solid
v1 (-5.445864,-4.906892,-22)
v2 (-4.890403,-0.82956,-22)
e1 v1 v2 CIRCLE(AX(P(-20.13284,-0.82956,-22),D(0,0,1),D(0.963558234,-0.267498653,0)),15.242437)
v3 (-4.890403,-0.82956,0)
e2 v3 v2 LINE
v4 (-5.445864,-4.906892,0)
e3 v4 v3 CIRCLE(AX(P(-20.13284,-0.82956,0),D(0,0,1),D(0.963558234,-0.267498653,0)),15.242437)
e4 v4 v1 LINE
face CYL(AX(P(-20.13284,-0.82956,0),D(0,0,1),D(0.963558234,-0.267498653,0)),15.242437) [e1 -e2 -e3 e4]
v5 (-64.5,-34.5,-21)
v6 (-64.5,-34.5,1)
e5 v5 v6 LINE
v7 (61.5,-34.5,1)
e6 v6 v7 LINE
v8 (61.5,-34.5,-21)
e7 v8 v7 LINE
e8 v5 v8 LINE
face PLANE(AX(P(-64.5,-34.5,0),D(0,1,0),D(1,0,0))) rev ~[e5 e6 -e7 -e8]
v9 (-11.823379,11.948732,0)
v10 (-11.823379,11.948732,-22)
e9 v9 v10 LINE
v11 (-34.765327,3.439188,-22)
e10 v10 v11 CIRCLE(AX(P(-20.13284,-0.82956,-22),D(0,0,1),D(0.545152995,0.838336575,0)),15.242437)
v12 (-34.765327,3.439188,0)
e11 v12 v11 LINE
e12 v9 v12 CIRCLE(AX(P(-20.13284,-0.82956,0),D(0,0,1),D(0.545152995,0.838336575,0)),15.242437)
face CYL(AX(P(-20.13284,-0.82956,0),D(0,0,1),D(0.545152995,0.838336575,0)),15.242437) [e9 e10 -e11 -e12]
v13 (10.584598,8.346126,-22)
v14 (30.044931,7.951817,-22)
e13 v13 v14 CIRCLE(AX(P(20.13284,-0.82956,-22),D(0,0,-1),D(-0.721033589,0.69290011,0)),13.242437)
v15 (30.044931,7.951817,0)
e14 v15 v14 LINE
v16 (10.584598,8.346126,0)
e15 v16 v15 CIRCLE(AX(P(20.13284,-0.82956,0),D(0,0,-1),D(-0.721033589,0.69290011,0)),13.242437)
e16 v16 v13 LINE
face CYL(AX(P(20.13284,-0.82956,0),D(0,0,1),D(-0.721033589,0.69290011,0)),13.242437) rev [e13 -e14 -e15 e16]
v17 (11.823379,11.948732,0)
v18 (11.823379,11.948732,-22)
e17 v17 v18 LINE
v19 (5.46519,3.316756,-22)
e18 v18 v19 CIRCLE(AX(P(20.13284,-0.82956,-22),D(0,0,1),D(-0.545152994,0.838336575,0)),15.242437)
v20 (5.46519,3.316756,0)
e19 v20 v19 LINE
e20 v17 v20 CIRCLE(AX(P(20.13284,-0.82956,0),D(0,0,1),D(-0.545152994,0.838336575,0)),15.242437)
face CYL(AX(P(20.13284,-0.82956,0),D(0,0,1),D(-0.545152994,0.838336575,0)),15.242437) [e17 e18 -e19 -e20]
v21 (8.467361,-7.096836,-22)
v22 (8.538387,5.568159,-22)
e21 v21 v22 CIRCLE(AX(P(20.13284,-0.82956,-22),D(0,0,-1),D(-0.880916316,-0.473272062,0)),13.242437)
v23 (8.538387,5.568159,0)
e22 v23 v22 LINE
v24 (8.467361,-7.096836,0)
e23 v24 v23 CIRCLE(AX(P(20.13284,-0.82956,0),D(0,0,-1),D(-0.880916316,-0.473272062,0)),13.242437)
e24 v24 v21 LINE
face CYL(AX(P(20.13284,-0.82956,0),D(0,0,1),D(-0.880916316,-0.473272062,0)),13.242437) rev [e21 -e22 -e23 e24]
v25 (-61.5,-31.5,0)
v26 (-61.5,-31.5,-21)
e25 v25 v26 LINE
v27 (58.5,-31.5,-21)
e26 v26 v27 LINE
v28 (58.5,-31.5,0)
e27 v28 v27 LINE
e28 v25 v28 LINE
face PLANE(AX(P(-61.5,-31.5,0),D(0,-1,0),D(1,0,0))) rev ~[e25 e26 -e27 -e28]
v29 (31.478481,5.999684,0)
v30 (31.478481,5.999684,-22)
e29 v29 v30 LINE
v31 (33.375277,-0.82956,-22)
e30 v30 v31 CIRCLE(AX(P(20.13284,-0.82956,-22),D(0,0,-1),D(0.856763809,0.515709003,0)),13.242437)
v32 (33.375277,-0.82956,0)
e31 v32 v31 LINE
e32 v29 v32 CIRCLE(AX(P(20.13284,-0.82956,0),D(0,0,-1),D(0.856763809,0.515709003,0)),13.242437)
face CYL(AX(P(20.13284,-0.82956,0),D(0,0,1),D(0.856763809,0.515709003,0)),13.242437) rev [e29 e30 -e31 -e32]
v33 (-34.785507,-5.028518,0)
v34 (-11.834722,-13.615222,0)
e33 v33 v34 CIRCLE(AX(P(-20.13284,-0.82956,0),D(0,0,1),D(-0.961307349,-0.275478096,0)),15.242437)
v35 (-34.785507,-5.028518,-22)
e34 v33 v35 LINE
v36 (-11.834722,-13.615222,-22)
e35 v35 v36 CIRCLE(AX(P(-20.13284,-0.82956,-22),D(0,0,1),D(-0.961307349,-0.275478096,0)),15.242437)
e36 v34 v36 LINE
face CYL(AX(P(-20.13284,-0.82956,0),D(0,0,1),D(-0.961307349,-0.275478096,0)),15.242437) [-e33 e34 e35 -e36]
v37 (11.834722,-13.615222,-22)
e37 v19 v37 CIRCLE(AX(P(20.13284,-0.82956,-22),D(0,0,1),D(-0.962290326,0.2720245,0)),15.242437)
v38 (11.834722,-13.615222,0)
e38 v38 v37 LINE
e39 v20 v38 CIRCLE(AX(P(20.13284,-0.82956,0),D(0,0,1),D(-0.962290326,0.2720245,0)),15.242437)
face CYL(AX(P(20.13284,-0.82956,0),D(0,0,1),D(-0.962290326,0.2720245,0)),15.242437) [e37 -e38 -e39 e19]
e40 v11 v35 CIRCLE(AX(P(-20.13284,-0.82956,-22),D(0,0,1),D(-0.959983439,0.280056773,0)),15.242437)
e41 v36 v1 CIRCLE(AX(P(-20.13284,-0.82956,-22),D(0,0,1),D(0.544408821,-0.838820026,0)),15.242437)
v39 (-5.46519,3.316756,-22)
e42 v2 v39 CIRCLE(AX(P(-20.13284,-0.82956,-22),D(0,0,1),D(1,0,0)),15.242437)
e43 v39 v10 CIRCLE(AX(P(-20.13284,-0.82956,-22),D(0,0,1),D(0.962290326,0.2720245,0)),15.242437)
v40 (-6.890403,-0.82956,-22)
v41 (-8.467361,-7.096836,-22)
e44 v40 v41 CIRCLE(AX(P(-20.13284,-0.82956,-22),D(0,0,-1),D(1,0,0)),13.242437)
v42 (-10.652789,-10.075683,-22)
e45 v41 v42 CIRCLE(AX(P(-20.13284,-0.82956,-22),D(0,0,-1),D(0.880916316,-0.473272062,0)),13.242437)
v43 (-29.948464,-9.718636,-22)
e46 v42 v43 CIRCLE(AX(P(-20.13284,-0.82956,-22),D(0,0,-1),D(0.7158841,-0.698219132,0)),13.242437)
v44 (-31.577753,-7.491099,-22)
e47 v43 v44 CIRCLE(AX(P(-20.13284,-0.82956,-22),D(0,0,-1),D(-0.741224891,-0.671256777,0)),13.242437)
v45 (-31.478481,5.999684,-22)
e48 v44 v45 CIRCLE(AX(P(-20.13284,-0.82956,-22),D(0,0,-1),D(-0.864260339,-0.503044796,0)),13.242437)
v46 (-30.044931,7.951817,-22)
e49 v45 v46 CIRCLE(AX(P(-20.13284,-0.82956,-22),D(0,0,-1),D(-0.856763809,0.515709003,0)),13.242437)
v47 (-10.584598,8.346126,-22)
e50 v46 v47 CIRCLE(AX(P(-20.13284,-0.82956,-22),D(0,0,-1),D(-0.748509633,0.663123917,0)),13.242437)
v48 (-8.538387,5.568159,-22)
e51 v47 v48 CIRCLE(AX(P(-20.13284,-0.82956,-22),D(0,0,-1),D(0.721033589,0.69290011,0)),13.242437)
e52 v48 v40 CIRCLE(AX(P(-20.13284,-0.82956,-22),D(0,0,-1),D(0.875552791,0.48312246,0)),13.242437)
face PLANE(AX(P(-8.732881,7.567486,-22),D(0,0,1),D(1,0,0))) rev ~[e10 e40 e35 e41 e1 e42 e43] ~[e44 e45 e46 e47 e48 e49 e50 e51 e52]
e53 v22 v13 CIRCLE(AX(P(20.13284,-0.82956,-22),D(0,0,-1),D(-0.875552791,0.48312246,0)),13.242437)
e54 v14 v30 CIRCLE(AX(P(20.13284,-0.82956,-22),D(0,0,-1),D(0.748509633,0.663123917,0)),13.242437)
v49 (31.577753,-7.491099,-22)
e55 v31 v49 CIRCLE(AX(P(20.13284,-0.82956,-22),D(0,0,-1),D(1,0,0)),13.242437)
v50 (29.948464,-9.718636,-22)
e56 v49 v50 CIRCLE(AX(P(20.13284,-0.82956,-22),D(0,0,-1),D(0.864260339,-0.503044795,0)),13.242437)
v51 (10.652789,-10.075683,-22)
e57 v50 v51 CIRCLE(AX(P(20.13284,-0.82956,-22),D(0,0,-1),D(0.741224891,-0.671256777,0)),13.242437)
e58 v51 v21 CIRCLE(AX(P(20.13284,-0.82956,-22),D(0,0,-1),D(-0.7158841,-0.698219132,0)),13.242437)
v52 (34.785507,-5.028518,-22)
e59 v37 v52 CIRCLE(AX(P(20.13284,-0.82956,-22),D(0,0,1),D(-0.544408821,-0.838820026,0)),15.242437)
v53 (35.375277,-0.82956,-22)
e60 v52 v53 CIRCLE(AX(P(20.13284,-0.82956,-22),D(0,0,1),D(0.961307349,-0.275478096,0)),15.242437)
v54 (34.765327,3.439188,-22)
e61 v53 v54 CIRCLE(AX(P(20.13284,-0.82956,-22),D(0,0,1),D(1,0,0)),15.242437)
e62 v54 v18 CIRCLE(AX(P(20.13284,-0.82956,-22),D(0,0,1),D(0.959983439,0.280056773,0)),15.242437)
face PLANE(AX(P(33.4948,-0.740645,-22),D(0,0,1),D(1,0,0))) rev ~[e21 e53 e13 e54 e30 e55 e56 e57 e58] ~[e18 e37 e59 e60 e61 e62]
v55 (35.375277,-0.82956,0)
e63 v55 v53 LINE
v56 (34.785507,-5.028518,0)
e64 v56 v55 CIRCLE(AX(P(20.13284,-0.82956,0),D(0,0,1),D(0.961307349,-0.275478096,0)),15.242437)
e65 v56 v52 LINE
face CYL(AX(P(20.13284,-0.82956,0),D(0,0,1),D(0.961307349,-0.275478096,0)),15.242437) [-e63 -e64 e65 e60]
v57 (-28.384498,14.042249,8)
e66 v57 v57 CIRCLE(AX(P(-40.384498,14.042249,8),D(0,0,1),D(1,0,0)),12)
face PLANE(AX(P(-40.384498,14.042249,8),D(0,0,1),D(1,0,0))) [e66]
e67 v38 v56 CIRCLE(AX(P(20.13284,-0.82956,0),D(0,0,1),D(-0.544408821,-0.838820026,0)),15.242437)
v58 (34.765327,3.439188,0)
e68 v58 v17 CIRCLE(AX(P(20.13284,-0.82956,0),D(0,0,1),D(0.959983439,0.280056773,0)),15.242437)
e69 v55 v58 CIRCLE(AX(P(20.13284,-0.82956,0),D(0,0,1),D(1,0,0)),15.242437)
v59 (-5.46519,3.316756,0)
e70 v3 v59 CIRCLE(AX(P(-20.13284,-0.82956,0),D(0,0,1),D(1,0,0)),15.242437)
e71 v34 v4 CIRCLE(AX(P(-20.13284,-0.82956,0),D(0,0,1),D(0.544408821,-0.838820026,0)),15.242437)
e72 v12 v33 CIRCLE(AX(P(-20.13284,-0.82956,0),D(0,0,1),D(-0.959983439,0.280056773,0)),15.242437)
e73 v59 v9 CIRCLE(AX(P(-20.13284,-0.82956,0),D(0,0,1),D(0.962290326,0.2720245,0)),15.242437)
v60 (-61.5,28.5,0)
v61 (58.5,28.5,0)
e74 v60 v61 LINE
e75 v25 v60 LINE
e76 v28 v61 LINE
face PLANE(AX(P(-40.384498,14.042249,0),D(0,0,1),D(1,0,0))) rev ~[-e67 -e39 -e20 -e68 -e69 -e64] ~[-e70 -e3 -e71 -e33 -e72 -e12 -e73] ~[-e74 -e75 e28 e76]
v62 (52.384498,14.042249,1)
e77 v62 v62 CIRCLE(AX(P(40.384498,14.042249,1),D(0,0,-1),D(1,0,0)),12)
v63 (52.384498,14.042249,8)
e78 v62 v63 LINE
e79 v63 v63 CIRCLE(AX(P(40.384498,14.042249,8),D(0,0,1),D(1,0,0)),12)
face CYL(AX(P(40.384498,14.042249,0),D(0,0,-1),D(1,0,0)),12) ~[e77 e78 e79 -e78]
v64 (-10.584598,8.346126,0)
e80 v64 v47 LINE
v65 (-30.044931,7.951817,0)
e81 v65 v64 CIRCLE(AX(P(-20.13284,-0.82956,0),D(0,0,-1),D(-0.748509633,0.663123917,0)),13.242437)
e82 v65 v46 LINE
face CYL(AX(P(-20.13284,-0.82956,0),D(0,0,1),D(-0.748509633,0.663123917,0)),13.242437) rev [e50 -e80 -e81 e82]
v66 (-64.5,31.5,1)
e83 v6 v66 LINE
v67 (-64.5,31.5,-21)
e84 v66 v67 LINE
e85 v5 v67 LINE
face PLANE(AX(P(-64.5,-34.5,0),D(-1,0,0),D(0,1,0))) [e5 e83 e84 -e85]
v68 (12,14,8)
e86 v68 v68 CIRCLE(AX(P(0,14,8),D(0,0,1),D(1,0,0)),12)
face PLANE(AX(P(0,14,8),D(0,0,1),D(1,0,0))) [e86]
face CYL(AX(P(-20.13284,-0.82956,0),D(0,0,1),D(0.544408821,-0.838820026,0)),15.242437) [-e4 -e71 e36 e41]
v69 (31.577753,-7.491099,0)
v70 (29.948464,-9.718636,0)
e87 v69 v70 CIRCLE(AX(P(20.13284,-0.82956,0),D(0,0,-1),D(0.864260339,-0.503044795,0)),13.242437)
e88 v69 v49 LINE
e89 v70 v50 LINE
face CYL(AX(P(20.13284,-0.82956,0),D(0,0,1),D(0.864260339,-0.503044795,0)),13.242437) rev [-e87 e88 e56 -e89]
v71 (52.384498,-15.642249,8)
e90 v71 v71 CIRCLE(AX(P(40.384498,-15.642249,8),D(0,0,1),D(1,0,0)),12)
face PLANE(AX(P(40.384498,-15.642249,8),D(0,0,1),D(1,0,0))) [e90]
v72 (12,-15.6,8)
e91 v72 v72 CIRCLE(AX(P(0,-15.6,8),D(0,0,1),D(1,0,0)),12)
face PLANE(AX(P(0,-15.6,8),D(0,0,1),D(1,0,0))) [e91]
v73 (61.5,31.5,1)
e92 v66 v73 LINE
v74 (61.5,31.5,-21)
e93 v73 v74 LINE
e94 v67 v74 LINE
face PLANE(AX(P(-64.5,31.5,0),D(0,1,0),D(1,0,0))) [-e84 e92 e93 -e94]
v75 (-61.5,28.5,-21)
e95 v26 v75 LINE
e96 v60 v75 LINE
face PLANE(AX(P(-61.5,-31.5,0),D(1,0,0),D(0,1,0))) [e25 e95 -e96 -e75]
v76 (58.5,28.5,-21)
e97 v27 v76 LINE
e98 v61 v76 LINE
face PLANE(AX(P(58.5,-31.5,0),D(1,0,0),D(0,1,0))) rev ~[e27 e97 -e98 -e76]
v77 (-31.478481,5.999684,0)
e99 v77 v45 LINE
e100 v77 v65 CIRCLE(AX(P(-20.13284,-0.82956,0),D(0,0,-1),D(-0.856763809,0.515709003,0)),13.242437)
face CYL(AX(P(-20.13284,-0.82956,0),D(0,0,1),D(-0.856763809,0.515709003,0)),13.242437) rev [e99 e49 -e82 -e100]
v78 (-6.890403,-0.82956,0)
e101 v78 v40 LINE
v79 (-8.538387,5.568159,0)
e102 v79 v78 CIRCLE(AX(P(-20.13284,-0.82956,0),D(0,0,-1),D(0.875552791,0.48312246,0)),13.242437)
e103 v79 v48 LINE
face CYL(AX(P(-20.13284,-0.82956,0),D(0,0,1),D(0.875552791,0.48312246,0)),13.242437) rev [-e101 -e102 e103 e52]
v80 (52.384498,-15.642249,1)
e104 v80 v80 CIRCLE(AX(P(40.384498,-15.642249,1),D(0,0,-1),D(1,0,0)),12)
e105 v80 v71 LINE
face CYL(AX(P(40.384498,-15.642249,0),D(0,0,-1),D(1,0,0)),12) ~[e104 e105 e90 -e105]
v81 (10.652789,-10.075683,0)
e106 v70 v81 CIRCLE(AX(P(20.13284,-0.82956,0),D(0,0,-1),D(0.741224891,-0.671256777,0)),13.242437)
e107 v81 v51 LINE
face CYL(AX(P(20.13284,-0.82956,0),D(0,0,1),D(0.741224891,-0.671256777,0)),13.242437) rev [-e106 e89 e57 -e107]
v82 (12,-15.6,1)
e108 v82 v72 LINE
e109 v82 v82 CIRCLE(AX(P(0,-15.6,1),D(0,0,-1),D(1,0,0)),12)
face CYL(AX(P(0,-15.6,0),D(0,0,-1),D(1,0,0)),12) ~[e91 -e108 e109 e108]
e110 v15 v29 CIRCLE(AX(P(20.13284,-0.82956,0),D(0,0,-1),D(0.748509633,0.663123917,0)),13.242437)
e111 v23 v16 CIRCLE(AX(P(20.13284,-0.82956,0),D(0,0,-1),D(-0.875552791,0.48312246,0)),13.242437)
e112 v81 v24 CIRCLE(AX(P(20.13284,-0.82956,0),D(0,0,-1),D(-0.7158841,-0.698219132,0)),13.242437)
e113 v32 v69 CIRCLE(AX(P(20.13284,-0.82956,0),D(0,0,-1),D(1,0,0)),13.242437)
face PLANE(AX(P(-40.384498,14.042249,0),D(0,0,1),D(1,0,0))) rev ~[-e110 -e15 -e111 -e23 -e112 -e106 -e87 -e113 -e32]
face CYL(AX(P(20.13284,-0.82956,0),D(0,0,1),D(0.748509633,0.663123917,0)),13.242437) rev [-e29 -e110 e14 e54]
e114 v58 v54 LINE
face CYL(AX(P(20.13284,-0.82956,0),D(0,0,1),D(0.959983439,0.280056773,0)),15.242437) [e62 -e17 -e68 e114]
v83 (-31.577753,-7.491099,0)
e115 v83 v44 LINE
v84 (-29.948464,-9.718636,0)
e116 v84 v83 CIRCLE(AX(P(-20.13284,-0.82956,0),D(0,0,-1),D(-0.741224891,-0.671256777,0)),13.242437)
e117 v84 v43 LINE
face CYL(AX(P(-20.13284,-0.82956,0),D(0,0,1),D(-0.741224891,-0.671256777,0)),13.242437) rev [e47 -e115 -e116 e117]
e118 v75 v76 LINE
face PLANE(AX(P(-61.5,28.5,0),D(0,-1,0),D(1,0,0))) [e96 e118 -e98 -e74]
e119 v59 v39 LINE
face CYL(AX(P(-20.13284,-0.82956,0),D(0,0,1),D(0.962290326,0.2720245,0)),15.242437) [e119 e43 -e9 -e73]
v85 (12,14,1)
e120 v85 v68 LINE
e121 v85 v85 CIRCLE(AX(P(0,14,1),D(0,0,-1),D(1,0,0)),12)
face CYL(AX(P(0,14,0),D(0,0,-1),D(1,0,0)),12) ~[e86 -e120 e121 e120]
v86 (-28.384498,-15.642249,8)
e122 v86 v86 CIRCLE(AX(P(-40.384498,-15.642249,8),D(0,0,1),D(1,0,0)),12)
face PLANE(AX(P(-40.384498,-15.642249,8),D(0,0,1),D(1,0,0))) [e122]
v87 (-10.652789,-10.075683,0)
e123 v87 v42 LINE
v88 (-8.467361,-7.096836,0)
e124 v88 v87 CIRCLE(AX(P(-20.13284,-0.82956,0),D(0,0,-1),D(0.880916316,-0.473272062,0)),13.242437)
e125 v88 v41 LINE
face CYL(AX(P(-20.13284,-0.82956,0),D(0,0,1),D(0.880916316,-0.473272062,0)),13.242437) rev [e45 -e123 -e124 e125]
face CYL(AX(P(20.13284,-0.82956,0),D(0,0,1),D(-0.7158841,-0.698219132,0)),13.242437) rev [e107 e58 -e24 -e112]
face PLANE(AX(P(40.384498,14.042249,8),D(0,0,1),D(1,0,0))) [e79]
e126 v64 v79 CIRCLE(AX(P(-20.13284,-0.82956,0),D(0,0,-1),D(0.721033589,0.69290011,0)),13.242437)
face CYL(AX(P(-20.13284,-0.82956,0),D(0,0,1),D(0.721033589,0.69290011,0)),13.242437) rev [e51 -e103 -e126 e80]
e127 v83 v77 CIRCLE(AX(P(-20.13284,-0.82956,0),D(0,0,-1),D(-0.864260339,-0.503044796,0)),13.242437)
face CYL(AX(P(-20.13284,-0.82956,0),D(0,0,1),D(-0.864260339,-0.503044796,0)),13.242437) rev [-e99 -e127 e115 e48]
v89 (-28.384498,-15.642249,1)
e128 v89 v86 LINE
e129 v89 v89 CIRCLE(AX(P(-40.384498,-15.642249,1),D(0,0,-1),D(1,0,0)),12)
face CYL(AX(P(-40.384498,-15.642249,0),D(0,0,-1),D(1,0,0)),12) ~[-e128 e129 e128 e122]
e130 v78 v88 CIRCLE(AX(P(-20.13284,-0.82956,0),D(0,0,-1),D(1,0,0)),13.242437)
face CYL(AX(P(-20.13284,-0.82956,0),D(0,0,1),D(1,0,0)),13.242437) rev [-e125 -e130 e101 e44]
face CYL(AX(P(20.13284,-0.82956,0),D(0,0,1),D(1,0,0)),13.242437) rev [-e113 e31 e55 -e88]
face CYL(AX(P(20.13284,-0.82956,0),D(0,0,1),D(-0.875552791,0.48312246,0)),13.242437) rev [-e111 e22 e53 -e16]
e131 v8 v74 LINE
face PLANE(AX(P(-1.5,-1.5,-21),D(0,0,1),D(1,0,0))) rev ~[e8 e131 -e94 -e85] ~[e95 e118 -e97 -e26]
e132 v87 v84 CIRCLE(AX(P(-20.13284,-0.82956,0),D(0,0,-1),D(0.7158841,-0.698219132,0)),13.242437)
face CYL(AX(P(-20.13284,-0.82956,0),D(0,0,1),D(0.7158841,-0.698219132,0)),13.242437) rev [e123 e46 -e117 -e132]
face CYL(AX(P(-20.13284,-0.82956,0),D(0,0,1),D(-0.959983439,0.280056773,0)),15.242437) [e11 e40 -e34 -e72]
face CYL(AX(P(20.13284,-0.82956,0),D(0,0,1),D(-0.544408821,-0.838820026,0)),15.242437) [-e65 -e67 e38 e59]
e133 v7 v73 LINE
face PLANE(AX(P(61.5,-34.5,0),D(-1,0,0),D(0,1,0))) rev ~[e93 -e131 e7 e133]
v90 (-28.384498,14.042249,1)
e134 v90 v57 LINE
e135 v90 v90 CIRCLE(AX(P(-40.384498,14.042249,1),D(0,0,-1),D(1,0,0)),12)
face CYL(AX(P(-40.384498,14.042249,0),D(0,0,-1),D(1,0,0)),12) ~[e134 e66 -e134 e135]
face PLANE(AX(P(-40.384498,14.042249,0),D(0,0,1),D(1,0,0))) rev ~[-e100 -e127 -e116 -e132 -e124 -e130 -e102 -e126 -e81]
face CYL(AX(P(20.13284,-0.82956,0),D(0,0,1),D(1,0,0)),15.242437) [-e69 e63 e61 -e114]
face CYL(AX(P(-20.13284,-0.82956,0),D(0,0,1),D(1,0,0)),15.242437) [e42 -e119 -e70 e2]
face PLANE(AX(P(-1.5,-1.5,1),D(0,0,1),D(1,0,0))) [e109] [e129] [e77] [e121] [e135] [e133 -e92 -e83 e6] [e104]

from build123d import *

# Parameters (mm, degrees)
F0_W     = 126
F0_H     = 66
F0_W_2   = 120
F0_H_2   = 60
F1_DEPTH = 21
F2_W     = 126
F2_H     = 66
F3_DEPTH = 1
F0_R     = 12
F4_DEPTH = 8
F6_DEPTH = 22


with BuildPart() as f1:
    # F0 (on Top) → F1 (new body)
    with BuildSketch(Plane.XY):
        with Locations((-1.5, -1.5)):
            Rectangle(F0_W, F0_H)
        with Locations((-1.5, -1.5)):
            Rectangle(F0_W_2, F0_H_2, mode=Mode.SUBTRACT)
    extrude(amount=-F1_DEPTH)

    # F2 (on face) → F3 (join)
    with BuildSketch(Plane.XY):
        with Locations((-1.5, -1.5)):
            Rectangle(F2_W, F2_H)
    extrude(amount=F3_DEPTH)

    # F0 (on Top) → F4 (join)
    with BuildSketch(Plane.XY):
        with Locations((-40.3844975889, 14.0422494113)):
            Circle(F0_R)
        with Locations((0, 14)):
            Circle(F0_R)
        with Locations((-40.3844975889, -15.6422494113)):
            Circle(F0_R)
        with Locations((0, -15.6)):
            Circle(F0_R)
        with Locations((40.3844975889, -15.6422494113)):
            Circle(F0_R)
        with Locations((40.3844975889, 14.0422494113)):
            Circle(F0_R)
    extrude(amount=F4_DEPTH)

    # F5 (on face) → F6 (join)
    with BuildSketch(Plane.XY):
        with BuildLine():
            ThreePointArc((31.4784805761, 5.99968384), (32.8922690999, 2.7143222033), (33.3752768321, -0.8295602165))
            ThreePointArc((33.3752768321, -0.8295602165), (32.9180007232, -4.2794585958), (31.5777529034, -7.4910993057))
            ThreePointArc((31.5777529034, -7.4910993057), (33.0771463209, -6.123708691), (34.7855065256, -5.0285177832))
            ThreePointArc((34.7855065256, -5.0285177832), (35.2271141548, -2.9496471052), (35.3752768321, -0.8295602165))
            ThreePointArc((35.3752768321, -0.8295602165), (35.2220188743, 1.3264920966), (34.7653269231, 3.4391875409))
            ThreePointArc((34.7653269231, 3.4391875409), (33.0099261031, 4.57569273), (31.4784805761, 5.99968384))
        make_face()
        with BuildLine():
            ThreePointArc((30.044931449, 7.9518165828), (30.8064288175, 7.0085924135), (31.4784805761, 5.99968384))
            ThreePointArc((31.4784805761, 5.99968384), (33.0099261031, 4.57569273), (34.7653269231, 3.4391875409))
            ThreePointArc((34.7653269231, 3.4391875409), (32.4184567267, 8.1923854782), (28.5856333111, 11.8543733283))
            ThreePointArc((28.5856333111, 11.8543733283), (29.1446126861, 9.8392757768), (30.044931449, 7.9518165828))
        make_face()
        with BuildLine():
            ThreePointArc((34.7855065256, -5.0285177832), (33.0771463209, -6.123708691), (31.5777529034, -7.4910993057))
            ThreePointArc((31.5777529034, -7.4910993057), (30.8212956484, -8.6474276201), (29.948463719, -9.718635897))
            ThreePointArc((29.948463719, -9.718635897), (29.0995516946, -11.5618087289), (28.5733528944, -13.5216690648))
            ThreePointArc((28.5733528944, -13.5216690648), (32.4355688891, -9.8281570151), (34.7855065256, -5.0285177832))
        make_face()
        with BuildLine():
            ThreePointArc((10.5845976874, 8.3461259481), (20.4011056558, 12.410159384), (30.044931449, 7.9518165828))
            ThreePointArc((30.044931449, 7.9518165828), (29.1446126861, 9.8392757768), (28.5856333111, 11.8543733283))
            ThreePointArc((28.5856333111, 11.8543733283), (20.2186418923, 14.4126354365), (11.8233794228, 11.9487323369))
            ThreePointArc((11.8233794228, 11.9487323369), (11.3478655588, 10.0979560153), (10.5845976874, 8.3461259481))
        make_face()
        with BuildLine():
            ThreePointArc((28.5733528944, -13.5216690648), (29.0995516946, -11.5618087289), (29.948463719, -9.718635897))
            ThreePointArc((29.948463719, -9.718635897), (20.3778358891, -14.0697308571), (10.652789482, -10.0756831869))
            ThreePointArc((10.652789482, -10.0756831869), (11.3821848264, -11.7992278973), (11.8347224415, -13.615221742))
            ThreePointArc((11.8347224415, -13.615221742), (20.2180287599, -16.0717593087), (28.5733528944, -13.5216690648))
        make_face()
        with BuildLine():
            ThreePointArc((8.5383868776, 5.5681585921), (9.4706325231, 7.0240682624), (10.5845976874, 8.3461259481))
            ThreePointArc((10.5845976874, 8.3461259481), (11.3478655588, 10.0979560153), (11.8233794228, 11.9487323369))
            ThreePointArc((11.8233794228, 11.9487323369), (7.86032363, 8.2101986383), (5.4651898622, 3.3167561214))
            ThreePointArc((5.4651898622, 3.3167561214), (7.0917024506, 4.3197233329), (8.5383868776, 5.5681585921))
        make_face()
        with BuildLine():
            ThreePointArc((11.8347224415, -13.615221742), (11.3821848264, -11.7992278973), (10.652789482, -10.0756831869))
            ThreePointArc((10.652789482, -10.0756831869), (9.455680238, -8.6628486697), (8.46736073, -7.0968357497))
            ThreePointArc((8.46736073, -7.0968357497), (7.0422594659, -5.8836950637), (5.4458638506, -4.9068916156))
            ThreePointArc((5.4458638506, -4.9068916156), (7.8431131072, -9.8459070996), (11.8347224415, -13.615221742))
        make_face()
        with BuildLine():
            ThreePointArc((8.46736073, -7.0968357497), (6.8906107626, -0.7552968983), (8.5383868776, 5.5681585921))
            ThreePointArc((8.5383868776, 5.5681585921), (7.0917024506, 4.3197233329), (5.4651898622, 3.3167561214))
            ThreePointArc((5.4651898622, 3.3167561214), (4.8904446173, -0.7937397736), (5.4458638506, -4.9068916156))
            ThreePointArc((5.4458638506, -4.9068916156), (7.0422594659, -5.8836950637), (8.46736073, -7.0968357497))
        make_face()
        with BuildLine():
            ThreePointArc((-8.5383868776, 5.5681585921), (-7.0917024506, 4.3197233329), (-5.4651898622, 3.3167561214))
            ThreePointArc((-5.4651898622, 3.3167561214), (-7.86032363, 8.2101986383), (-11.8233794228, 11.9487323369))
            ThreePointArc((-11.8233794228, 11.9487323369), (-11.3478655588, 10.0979560153), (-10.5845976874, 8.3461259481))
            ThreePointArc((-10.5845976874, 8.3461259481), (-9.4706325231, 7.0240682624), (-8.5383868776, 5.5681585921))
        make_face()
        with BuildLine():
            ThreePointArc((-4.8904025274, -0.8295602165), (-5.034783168, 1.2634232792), (-5.4651898622, 3.3167561214))
            ThreePointArc((-5.4651898622, 3.3167561214), (-7.0917024506, 4.3197233329), (-8.5383868776, 5.5681585921))
            ThreePointArc((-8.5383868776, 5.5681585921), (-7.3090150887, 2.4737206667), (-6.8904025274, -0.8295602165))
            ThreePointArc((-6.8904025274, -0.8295602165), (-7.2906920093, -4.0608734086), (-8.46736073, -7.0968357497))
            ThreePointArc((-8.46736073, -7.0968357497), (-7.0422594659, -5.8836950637), (-5.4458638506, -4.9068916156))
            ThreePointArc((-5.4458638506, -4.9068916156), (-5.0299062498, -2.8870567912), (-4.8904025274, -0.8295602165))
        make_face()
        with BuildLine():
            ThreePointArc((-10.5845976874, 8.3461259481), (-11.3478655588, 10.0979560153), (-11.8233794228, 11.9487323369))
            ThreePointArc((-11.8233794228, 11.9487323369), (-20.2186418923, 14.4126354365), (-28.5856333111, 11.8543733283))
            ThreePointArc((-28.5856333111, 11.8543733283), (-29.1446126861, 9.8392757768), (-30.044931449, 7.9518165828))
            ThreePointArc((-30.044931449, 7.9518165828), (-20.4011056558, 12.410159384), (-10.5845976874, 8.3461259481))
        make_face()
        with BuildLine():
            ThreePointArc((-11.8347224415, -13.615221742), (-7.8431131072, -9.8459070996), (-5.4458638506, -4.9068916156))
            ThreePointArc((-5.4458638506, -4.9068916156), (-7.0422594659, -5.8836950637), (-8.46736073, -7.0968357497))
            ThreePointArc((-8.46736073, -7.0968357497), (-9.455680238, -8.6628486697), (-10.652789482, -10.0756831869))
            ThreePointArc((-10.652789482, -10.0756831869), (-11.3821848264, -11.7992278973), (-11.8347224415, -13.615221742))
        make_face()
        with BuildLine():
            ThreePointArc((-28.5733528944, -13.5216690648), (-20.2180287599, -16.0717593087), (-11.8347224415, -13.615221742))
            ThreePointArc((-11.8347224415, -13.615221742), (-11.3821848264, -11.7992278973), (-10.652789482, -10.0756831869))
            ThreePointArc((-10.652789482, -10.0756831869), (-20.3778358891, -14.0697308571), (-29.948463719, -9.718635897))
            ThreePointArc((-29.948463719, -9.718635897), (-29.0995516946, -11.5618087289), (-28.5733528944, -13.5216690648))
        make_face()
        with BuildLine():
            ThreePointArc((-30.044931449, 7.9518165828), (-29.1446126861, 9.8392757768), (-28.5856333111, 11.8543733283))
            ThreePointArc((-28.5856333111, 11.8543733283), (-32.4184567267, 8.1923854782), (-34.7653269231, 3.4391875409))
            ThreePointArc((-34.7653269231, 3.4391875409), (-33.0099261031, 4.57569273), (-31.4784805761, 5.99968384))
            ThreePointArc((-31.4784805761, 5.99968384), (-30.8064288175, 7.0085924135), (-30.044931449, 7.9518165828))
        make_face()
        with BuildLine():
            ThreePointArc((-34.7855065256, -5.0285177832), (-32.4355688891, -9.8281570151), (-28.5733528944, -13.5216690648))
            ThreePointArc((-28.5733528944, -13.5216690648), (-29.0995516946, -11.5618087289), (-29.948463719, -9.718635897))
            ThreePointArc((-29.948463719, -9.718635897), (-30.8212956484, -8.6474276201), (-31.5777529034, -7.4910993057))
            ThreePointArc((-31.5777529034, -7.4910993057), (-33.0771463209, -6.123708691), (-34.7855065256, -5.0285177832))
        make_face()
        with BuildLine():
            ThreePointArc((-31.4784805761, 5.99968384), (-33.0099261031, 4.57569273), (-34.7653269231, 3.4391875409))
            ThreePointArc((-34.7653269231, 3.4391875409), (-35.3752335492, -0.7932356825), (-34.7855065256, -5.0285177832))
            ThreePointArc((-34.7855065256, -5.0285177832), (-33.0771463209, -6.123708691), (-31.5777529034, -7.4910993057))
            ThreePointArc((-31.5777529034, -7.4910993057), (-33.3749183212, -0.7321179887), (-31.4784805761, 5.99968384))
        make_face()
    extrude(amount=-F6_DEPTH)


solid = f1.part
